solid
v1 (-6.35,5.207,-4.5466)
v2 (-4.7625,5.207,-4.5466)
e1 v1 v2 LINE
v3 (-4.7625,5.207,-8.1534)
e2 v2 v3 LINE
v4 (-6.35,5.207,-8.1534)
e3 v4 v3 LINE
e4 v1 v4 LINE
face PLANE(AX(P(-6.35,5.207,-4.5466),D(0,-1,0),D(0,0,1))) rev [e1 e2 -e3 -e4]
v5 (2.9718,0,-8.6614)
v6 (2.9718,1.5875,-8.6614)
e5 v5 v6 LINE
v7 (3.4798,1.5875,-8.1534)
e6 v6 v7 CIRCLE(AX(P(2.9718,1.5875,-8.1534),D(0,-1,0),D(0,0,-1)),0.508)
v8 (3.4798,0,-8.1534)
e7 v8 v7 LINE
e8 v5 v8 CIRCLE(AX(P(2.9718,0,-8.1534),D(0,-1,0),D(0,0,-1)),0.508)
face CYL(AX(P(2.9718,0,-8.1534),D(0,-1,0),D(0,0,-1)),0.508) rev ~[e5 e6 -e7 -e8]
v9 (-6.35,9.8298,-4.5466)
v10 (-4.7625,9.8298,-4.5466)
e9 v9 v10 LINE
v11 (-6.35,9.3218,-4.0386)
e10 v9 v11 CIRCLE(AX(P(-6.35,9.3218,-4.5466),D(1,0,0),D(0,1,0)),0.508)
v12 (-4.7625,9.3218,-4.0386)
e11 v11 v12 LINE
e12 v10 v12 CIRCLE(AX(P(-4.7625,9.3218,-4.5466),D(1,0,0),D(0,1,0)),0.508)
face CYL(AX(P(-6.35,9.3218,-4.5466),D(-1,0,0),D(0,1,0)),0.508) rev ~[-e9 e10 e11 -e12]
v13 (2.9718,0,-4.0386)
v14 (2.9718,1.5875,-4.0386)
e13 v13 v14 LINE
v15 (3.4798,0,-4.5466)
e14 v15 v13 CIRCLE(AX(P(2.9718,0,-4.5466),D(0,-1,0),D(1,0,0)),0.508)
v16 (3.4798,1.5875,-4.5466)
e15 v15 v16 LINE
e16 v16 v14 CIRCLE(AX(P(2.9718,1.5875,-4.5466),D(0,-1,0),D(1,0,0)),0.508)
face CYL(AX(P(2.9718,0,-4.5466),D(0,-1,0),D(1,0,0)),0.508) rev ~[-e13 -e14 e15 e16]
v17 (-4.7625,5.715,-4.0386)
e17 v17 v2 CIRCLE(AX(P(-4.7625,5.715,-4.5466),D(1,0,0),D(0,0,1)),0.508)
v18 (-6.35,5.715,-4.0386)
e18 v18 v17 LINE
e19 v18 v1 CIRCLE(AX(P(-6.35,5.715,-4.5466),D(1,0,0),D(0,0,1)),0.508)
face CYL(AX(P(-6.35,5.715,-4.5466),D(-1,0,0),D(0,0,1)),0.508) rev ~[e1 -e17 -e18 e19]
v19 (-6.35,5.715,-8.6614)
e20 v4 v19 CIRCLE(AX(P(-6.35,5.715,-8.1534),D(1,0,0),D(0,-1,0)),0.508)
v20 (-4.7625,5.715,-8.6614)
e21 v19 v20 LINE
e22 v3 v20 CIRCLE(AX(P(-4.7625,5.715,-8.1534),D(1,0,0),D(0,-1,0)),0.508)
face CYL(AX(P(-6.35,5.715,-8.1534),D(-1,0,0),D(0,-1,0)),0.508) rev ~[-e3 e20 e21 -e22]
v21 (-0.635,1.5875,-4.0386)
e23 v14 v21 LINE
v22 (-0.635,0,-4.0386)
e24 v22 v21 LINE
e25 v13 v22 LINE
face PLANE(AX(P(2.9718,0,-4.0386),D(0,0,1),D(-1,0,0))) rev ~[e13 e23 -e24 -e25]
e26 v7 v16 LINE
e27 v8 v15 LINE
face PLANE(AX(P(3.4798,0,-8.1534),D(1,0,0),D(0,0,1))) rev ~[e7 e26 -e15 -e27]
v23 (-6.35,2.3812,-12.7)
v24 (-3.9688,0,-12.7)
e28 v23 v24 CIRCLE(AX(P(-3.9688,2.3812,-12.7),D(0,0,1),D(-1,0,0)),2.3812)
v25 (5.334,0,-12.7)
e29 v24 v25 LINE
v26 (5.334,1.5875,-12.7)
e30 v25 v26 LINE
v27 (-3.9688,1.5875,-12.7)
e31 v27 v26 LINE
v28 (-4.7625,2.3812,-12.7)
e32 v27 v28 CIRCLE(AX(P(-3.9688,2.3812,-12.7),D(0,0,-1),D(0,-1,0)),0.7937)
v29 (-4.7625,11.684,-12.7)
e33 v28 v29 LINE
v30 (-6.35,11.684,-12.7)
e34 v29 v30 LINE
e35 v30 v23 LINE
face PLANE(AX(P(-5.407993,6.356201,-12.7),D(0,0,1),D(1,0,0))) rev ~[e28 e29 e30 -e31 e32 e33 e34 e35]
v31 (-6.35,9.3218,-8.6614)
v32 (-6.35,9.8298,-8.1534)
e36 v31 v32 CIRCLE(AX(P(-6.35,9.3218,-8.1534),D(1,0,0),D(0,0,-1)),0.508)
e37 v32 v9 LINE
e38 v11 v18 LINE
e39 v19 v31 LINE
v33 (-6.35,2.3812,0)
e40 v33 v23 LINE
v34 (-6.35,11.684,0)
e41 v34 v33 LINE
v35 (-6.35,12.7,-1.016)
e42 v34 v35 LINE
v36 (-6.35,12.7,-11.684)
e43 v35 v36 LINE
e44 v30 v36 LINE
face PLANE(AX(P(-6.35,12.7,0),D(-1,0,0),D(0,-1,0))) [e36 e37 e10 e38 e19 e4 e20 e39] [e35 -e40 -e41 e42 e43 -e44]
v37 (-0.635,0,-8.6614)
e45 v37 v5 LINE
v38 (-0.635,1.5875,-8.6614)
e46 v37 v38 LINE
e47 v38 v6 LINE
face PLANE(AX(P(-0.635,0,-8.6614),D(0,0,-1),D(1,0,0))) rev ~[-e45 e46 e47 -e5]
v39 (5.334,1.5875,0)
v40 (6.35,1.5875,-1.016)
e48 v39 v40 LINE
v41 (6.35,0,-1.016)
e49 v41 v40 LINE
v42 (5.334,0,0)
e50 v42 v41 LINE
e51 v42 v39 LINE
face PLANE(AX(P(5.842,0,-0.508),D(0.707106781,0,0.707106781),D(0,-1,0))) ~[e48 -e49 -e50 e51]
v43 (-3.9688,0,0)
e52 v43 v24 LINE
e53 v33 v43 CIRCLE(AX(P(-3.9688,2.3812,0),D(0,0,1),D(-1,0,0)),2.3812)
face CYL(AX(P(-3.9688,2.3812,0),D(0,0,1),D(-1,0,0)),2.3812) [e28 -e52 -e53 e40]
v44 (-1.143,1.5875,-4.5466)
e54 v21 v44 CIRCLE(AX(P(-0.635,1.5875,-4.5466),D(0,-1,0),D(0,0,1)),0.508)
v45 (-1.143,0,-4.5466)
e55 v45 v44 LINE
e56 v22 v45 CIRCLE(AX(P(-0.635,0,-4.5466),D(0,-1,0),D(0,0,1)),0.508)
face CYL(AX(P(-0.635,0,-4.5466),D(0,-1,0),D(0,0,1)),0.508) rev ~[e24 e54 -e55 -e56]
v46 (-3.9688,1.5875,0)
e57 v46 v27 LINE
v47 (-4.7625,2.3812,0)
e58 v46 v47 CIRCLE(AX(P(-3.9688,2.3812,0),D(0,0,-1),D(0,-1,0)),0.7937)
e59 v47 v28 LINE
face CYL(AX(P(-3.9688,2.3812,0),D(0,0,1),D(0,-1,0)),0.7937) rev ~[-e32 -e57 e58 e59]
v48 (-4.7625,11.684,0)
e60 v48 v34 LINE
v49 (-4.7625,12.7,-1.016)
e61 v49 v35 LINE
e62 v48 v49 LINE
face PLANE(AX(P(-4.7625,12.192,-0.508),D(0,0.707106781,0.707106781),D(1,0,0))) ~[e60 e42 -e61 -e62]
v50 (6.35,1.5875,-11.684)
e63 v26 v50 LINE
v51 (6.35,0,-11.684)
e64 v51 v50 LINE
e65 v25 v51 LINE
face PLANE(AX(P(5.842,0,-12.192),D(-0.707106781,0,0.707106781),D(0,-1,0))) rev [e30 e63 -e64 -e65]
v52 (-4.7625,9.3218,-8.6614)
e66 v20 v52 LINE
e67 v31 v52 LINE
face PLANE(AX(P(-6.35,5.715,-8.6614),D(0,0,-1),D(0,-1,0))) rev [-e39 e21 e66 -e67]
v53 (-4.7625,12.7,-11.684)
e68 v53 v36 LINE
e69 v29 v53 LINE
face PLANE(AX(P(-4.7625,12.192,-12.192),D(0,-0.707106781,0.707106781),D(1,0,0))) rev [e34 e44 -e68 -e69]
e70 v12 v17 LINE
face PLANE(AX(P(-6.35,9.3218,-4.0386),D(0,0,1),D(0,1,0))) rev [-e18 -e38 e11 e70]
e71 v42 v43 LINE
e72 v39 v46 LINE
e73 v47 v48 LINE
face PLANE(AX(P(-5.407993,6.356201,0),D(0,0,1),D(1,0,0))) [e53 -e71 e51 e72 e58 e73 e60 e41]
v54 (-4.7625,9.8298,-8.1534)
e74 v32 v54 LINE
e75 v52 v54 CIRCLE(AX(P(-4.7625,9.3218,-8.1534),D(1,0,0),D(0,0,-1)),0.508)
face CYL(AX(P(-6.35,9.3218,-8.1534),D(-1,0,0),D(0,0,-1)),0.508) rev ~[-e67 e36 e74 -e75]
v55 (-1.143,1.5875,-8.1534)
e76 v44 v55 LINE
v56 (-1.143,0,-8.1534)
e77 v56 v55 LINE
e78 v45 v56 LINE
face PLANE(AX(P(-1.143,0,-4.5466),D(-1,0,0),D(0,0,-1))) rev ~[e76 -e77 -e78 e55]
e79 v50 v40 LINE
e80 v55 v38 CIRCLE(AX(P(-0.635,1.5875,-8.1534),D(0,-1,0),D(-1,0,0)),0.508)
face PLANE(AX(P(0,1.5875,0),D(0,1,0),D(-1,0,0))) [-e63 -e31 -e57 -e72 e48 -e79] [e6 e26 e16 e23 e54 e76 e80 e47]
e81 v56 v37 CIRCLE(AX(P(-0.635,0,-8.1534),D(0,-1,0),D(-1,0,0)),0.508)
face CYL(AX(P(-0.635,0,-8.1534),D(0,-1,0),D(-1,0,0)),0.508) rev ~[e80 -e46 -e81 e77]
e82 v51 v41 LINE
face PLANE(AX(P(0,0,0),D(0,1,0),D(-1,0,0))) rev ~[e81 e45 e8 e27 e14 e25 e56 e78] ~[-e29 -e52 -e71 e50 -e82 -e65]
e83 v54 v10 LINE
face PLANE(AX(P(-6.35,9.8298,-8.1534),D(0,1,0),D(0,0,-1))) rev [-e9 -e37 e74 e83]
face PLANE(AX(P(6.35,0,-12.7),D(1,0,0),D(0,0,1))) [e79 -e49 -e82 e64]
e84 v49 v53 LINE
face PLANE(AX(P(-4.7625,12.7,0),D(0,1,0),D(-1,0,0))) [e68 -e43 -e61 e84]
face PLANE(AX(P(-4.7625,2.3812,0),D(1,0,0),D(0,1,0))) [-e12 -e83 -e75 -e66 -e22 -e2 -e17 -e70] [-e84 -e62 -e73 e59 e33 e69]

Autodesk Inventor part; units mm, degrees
ref_plane "YZ Plane" through (0, 0, 0) normal (1, 0, 0) x (0, 1, 0)
ref_plane "XZ Plane" through (0, 0, 0) normal (0, 1, 0) x (-1, 0, 0)
sketch "Sketch1" plane through (0, 0, 0) normal (0, 1, 0) x (-1, 0, 0)
  line L0 (-6.35, 0) -> (6.35, 0)
  line L1 (6.35, 0) -> (6.35, -12.7)
  line L2 (6.35, -12.7) -> (-6.35, -12.7)
  line L3 (-6.35, -12.7) -> (-6.35, 0)
  line L4 (6.35, 0) -> (-6.35, -12.7) construction
  point P0 (0, 0)
  point P1 (0, 0)
  dimension "d0" = 12.7
  dimension "d1" = 12.7
extrude "Plate1" add sketch "Sketch1" along normal blind 1.5875
sketch "Sketch2" plane through (-4.7625, 0, 0) normal (-1, 0, 0) x (0, -1, 0)
  line L0 (0, -12.7) -> (0, 0)
  line L1 (0, 0) -> (-12.7, 0)
  line L2 (-12.7, 0) -> (-12.7, -12.7)
  line L3 (-12.7, -12.7) -> (0, -12.7)
edge flange "Flanges" height 12.7 angle 90 thickness 1.5875 bend radius 0.7937 thickness toward (-1, 0, 0) relief tear relief width 1.5875 relief depth 0.7937 edges at (-6.35, 1.5875, -6.35) wall of the first edge with corners at (-4.7625, 0, -12.7) (-4.7625, 0, 0) (-4.7625, 12.7, 0) (-4.7625, 12.7, -12.7)
bend "Bend1"
corner "Corner1"
sketch "Sketch8" plane through (0, 0, 0) normal (0, -1, 0) x (1, 0, 0)
  line L0 (6.35, 0) -> (-3.9687, 0) construction
  line L1 (2.9718, -4.0386) -> (-0.635, -4.0386)
  line L2 (-1.143, -4.5466) -> (-1.143, -8.1534)
  line L3 (-0.635, -8.6614) -> (2.9718, -8.6614)
  line L4 (3.4798, -8.1534) -> (3.4798, -4.5466)
  arc A0 (3.4798, -4.5466) -> (2.9718, -4.0386) centre (2.9718, -4.5466) ccw
  arc A1 (2.9718, -8.6614) -> (3.4798, -8.1534) centre (2.9718, -8.1534) ccw
  arc A2 (-1.143, -8.1534) -> (-0.635, -8.6614) centre (-0.635, -8.1534) ccw
  arc A3 (-0.635, -4.0386) -> (-1.143, -4.5466) centre (-0.635, -4.5466) ccw
  line L5 (2.9718, -4.5466) -> (-0.635, -8.1534) construction
  line L6 (6.35, -12.7) -> (6.35, 0) construction
  point P0 (0, 0)
  point P1 (-1.143, -8.6614)
  point P2 (3.4798, -8.6614)
  point P3 (12.7, 0)
  point P4 (1.1684, -6.35)
  dimension "d49" = 4.6228
  dimension "d50" = 0.508
  dimension "d52" = 6.35
  dimension "d123" = 5.1816
extrude "Body Stamp" cut sketch "Sketch8" against normal blind 1.5875
sketch "Sketch9" plane through (0, 0, 0) normal (0, -1, 0) x (1, 0, 0)
  arc A0 (3.4798, -4.5466) -> (2.9718, -4.0386) centre (2.9718, -4.5466) ccw construction
  arc A1 (-1.143, -8.1534) -> (-0.635, -8.6614) centre (-0.635, -8.1534) ccw construction
  line L0 (2.9718, -4.5466) -> (-0.635, -8.1534) construction
  circle A2 centre (1.1684, -6.35) radius 2.1844
  point P0 (0, 0)
  dimension "d55" = 4.3688
surface extrude "Body Circle" sketch "Sketch9" against normal up to surface (1.5875 mm away) shown yes curves A2
pattern_sketch "Body Pattern" of "Body Stamp", "Body Circle" from (1.1684, 0, -6.35) copies at (1.1684, 0, -19.05) at (1.1684, 0, -31.75) at (1.1684, 0, -44.45) at (1.1684, 0, -57.15) at (1.1684, 0, -69.85) at (1.1684, 0, -82.55) at (1.1684, 0, -95.25) at (1.1684, 0, -107.95) at (1.1684, 0, -120.65) at (1.1684, 0, -133.35) at (1.1684, 0, -146.05) at (1.1684, 0, -158.75) at (1.1684, 0, -171.45) at (1.1684, 0, -184.15) at (1.1684, 0, -196.85) at (1.1684, 0, -209.55) at (1.1684, 0, -222.25) at (1.1684, 0, -234.95) at (1.1684, 0, -247.65) at (1.1684, 0, -260.35) at (1.1684, 0, -273.05) at (1.1684, 0, -285.75) at (1.1684, 0, -298.45) at (1.1684, 0, -311.15) at (1.1684, 0, -323.85) at (1.1684, 0, -336.55) at (1.1684, 0, -349.25) at (1.1684, 0, -361.95) at (1.1684, 0, -374.65) at (1.1684, 0, -387.35) at (1.1684, 0, -400.05) at (1.1684, 0, -412.75) at (1.1684, 0, -425.45) at (1.1684, 0, -438.15)
sketch "Arc Length" plane through (19.05, 2.3812, 0) normal (0, 0, 1) x (1, 0, 0)
  line L0 (-25.4, 0) -> (-23.8125, 0) projected
  arc A0 (-25.4, 0) -> (-23.0187, -2.3813) centre (-23.0187, 0) ccw projected
  line L1 (-23.0187, -0.7938) -> (-23.0187, -2.3813) projected
  arc A1 (-23.8125, 0) -> (-23.0187, -0.7938) centre (-23.0187, 0) ccw projected
  point P0 (-19.05, -2.3812)
  dimension "d126" = 1.2468
  dimension "d127" = 3.7405
sketch "Sketch13" plane through (-6.35, 0, 431.8) normal (1, 0, 0) x (0, 0, -1)
  line L0 (493.268, 12.7) -> (495.3, 10.668)
  line L1 (495.3, 10.668) -> (497.332, 12.7)
  line L2 (493.268, 12.7) -> (497.332, 12.7)
  line L3 (495.3, 3.3973) -> (493.0372, 1.1344)
  line L4 (493.0372, 1.1344) -> (495.3, -1.1284)
  line L5 (495.3, -1.1284) -> (497.5628, 1.1344)
  line L6 (497.5628, 1.1344) -> (495.3, 3.3973)
  line L7 (495.3, 3.3973) -> (495.3, -1.1284) construction
  line L8 (495.3, 10.668) -> (495.3, 3.3973) construction
  line L9 (444.5, 12.7) -> (431.8, 12.7) projected
  line L10 (444.5, 2.3813) -> (431.8, 2.3813) construction
  line L11 (431.8, 12.7) -> (431.8, 2.3813) construction
  point P0 (444.5, -11.9062)
  point P1 (431.8, 0)
  dimension "d86" = 4.5256
  dimension "d128" = 2.032
  dimension "d129" = 1.016
  dimension "d130" = 63.5
feature "Notch" [suppressed]
pattern_linear "Notch Pattern" [suppressed]
ref_plane "Diagonal Plane" through (-4.7625, 1.5875, 0) normal (-0.7071068, 0.7071068, 0) x (0, 0, 1)
mirror "Everything Mirrored" about plane through (-4.7625, 1.5875, 0) normal (-0.7071068, 0.7071068, 0) of "Body Stamp", "Body Circle", "Body Pattern"
chamfer "End Chamfer" distance 1.016 angle 45 4 edges at (-5.5562, 12.7, -12.7) (-5.5562, 12.7, 0) (6.35, 0.7937, 0) (6.35, 0.7937, -12.7)
sketch "Body Pattern Sketch" plane through (0, 0, 0) normal (0, -1, 0) x (1, 0, 0)
  line L0 (1.1684, -6.35) -> (1.1684, 0) construction
  circle A0 centre (1.1684, -6.35) radius 2.1844 construction
  point P0 (1.1684, -19.05)
  point P1 (1.1684, -31.75)
  point P2 (1.1684, -44.45)
  point P3 (1.1684, -57.15)
  point P4 (1.1684, -69.85)
  point P5 (1.1684, -82.55)
  point P6 (1.1684, -95.25)
  point P7 (1.1684, -107.95)
  point P8 (1.1684, -120.65)
  point P9 (1.1684, -133.35)
  point P10 (1.1684, -146.05)
  point P11 (1.1684, -158.75)
  point P12 (1.1684, -171.45)
  point P13 (1.1684, -184.15)
  point P14 (1.1684, -196.85)
  point P15 (1.1684, -209.55)
  point P16 (1.1684, -222.25)
  point P17 (1.1684, -234.95)
  point P18 (1.1684, -247.65)
  point P19 (1.1684, -260.35)
  point P20 (1.1684, -273.05)
  point P21 (1.1684, -285.75)
  point P22 (1.1684, -298.45)
  point P23 (1.1684, -311.15)
  point P24 (1.1684, -323.85)
  point P25 (1.1684, -336.55)
  point P26 (1.1684, -349.25)
  point P27 (1.1684, -361.95)
  point P28 (1.1684, -374.65)
  point P29 (1.1684, -387.35)
  point P30 (1.1684, -400.05)
  point P31 (1.1684, -412.75)
  point P32 (1.1684, -425.45)
  point P33 (1.1684, -438.15)
  dimension "d133" = 12.7
equation "\"d1\" = 12.7 * Length"
equation "\"d53\" = Thickness"
equation "\"d89\" = Thickness"
equation "\"d2\" = Thickness"
equation "\"d3\" = BendReliefWidth"
equation "\"d4\" = BendReliefDepth"
equation "\"d5\" = MinimumRemnant"
equation "\"d6\" = TransitionRadius"
equation "\"d10\" = CornerReliefSize"
equation "\"d11\" = GapSize"
equation "\"d12\" = JacobiRadiusSize"
equation "\"BendRadius\" = Thickness"
equation "\"BendReliefWidth\" = Thickness"
equation "\"BendReliefDepth\" = 0.5 * Thickness"
equation "\"CornerReliefSize\" = 4 * Thickness"
equation "\"MinimumRemnant\" = 2 * Thickness"
equation "\"TransitionRadius\" = BendRadius"
equation "\"JacobiRadiusSize\" = BendRadius"
equation "\"GapSize\" = Thickness"
equation "\"Length\" = 1"
equation "\"Thickness\" = 1.5875"
properties part number "Alu C 1x2x1x35"
